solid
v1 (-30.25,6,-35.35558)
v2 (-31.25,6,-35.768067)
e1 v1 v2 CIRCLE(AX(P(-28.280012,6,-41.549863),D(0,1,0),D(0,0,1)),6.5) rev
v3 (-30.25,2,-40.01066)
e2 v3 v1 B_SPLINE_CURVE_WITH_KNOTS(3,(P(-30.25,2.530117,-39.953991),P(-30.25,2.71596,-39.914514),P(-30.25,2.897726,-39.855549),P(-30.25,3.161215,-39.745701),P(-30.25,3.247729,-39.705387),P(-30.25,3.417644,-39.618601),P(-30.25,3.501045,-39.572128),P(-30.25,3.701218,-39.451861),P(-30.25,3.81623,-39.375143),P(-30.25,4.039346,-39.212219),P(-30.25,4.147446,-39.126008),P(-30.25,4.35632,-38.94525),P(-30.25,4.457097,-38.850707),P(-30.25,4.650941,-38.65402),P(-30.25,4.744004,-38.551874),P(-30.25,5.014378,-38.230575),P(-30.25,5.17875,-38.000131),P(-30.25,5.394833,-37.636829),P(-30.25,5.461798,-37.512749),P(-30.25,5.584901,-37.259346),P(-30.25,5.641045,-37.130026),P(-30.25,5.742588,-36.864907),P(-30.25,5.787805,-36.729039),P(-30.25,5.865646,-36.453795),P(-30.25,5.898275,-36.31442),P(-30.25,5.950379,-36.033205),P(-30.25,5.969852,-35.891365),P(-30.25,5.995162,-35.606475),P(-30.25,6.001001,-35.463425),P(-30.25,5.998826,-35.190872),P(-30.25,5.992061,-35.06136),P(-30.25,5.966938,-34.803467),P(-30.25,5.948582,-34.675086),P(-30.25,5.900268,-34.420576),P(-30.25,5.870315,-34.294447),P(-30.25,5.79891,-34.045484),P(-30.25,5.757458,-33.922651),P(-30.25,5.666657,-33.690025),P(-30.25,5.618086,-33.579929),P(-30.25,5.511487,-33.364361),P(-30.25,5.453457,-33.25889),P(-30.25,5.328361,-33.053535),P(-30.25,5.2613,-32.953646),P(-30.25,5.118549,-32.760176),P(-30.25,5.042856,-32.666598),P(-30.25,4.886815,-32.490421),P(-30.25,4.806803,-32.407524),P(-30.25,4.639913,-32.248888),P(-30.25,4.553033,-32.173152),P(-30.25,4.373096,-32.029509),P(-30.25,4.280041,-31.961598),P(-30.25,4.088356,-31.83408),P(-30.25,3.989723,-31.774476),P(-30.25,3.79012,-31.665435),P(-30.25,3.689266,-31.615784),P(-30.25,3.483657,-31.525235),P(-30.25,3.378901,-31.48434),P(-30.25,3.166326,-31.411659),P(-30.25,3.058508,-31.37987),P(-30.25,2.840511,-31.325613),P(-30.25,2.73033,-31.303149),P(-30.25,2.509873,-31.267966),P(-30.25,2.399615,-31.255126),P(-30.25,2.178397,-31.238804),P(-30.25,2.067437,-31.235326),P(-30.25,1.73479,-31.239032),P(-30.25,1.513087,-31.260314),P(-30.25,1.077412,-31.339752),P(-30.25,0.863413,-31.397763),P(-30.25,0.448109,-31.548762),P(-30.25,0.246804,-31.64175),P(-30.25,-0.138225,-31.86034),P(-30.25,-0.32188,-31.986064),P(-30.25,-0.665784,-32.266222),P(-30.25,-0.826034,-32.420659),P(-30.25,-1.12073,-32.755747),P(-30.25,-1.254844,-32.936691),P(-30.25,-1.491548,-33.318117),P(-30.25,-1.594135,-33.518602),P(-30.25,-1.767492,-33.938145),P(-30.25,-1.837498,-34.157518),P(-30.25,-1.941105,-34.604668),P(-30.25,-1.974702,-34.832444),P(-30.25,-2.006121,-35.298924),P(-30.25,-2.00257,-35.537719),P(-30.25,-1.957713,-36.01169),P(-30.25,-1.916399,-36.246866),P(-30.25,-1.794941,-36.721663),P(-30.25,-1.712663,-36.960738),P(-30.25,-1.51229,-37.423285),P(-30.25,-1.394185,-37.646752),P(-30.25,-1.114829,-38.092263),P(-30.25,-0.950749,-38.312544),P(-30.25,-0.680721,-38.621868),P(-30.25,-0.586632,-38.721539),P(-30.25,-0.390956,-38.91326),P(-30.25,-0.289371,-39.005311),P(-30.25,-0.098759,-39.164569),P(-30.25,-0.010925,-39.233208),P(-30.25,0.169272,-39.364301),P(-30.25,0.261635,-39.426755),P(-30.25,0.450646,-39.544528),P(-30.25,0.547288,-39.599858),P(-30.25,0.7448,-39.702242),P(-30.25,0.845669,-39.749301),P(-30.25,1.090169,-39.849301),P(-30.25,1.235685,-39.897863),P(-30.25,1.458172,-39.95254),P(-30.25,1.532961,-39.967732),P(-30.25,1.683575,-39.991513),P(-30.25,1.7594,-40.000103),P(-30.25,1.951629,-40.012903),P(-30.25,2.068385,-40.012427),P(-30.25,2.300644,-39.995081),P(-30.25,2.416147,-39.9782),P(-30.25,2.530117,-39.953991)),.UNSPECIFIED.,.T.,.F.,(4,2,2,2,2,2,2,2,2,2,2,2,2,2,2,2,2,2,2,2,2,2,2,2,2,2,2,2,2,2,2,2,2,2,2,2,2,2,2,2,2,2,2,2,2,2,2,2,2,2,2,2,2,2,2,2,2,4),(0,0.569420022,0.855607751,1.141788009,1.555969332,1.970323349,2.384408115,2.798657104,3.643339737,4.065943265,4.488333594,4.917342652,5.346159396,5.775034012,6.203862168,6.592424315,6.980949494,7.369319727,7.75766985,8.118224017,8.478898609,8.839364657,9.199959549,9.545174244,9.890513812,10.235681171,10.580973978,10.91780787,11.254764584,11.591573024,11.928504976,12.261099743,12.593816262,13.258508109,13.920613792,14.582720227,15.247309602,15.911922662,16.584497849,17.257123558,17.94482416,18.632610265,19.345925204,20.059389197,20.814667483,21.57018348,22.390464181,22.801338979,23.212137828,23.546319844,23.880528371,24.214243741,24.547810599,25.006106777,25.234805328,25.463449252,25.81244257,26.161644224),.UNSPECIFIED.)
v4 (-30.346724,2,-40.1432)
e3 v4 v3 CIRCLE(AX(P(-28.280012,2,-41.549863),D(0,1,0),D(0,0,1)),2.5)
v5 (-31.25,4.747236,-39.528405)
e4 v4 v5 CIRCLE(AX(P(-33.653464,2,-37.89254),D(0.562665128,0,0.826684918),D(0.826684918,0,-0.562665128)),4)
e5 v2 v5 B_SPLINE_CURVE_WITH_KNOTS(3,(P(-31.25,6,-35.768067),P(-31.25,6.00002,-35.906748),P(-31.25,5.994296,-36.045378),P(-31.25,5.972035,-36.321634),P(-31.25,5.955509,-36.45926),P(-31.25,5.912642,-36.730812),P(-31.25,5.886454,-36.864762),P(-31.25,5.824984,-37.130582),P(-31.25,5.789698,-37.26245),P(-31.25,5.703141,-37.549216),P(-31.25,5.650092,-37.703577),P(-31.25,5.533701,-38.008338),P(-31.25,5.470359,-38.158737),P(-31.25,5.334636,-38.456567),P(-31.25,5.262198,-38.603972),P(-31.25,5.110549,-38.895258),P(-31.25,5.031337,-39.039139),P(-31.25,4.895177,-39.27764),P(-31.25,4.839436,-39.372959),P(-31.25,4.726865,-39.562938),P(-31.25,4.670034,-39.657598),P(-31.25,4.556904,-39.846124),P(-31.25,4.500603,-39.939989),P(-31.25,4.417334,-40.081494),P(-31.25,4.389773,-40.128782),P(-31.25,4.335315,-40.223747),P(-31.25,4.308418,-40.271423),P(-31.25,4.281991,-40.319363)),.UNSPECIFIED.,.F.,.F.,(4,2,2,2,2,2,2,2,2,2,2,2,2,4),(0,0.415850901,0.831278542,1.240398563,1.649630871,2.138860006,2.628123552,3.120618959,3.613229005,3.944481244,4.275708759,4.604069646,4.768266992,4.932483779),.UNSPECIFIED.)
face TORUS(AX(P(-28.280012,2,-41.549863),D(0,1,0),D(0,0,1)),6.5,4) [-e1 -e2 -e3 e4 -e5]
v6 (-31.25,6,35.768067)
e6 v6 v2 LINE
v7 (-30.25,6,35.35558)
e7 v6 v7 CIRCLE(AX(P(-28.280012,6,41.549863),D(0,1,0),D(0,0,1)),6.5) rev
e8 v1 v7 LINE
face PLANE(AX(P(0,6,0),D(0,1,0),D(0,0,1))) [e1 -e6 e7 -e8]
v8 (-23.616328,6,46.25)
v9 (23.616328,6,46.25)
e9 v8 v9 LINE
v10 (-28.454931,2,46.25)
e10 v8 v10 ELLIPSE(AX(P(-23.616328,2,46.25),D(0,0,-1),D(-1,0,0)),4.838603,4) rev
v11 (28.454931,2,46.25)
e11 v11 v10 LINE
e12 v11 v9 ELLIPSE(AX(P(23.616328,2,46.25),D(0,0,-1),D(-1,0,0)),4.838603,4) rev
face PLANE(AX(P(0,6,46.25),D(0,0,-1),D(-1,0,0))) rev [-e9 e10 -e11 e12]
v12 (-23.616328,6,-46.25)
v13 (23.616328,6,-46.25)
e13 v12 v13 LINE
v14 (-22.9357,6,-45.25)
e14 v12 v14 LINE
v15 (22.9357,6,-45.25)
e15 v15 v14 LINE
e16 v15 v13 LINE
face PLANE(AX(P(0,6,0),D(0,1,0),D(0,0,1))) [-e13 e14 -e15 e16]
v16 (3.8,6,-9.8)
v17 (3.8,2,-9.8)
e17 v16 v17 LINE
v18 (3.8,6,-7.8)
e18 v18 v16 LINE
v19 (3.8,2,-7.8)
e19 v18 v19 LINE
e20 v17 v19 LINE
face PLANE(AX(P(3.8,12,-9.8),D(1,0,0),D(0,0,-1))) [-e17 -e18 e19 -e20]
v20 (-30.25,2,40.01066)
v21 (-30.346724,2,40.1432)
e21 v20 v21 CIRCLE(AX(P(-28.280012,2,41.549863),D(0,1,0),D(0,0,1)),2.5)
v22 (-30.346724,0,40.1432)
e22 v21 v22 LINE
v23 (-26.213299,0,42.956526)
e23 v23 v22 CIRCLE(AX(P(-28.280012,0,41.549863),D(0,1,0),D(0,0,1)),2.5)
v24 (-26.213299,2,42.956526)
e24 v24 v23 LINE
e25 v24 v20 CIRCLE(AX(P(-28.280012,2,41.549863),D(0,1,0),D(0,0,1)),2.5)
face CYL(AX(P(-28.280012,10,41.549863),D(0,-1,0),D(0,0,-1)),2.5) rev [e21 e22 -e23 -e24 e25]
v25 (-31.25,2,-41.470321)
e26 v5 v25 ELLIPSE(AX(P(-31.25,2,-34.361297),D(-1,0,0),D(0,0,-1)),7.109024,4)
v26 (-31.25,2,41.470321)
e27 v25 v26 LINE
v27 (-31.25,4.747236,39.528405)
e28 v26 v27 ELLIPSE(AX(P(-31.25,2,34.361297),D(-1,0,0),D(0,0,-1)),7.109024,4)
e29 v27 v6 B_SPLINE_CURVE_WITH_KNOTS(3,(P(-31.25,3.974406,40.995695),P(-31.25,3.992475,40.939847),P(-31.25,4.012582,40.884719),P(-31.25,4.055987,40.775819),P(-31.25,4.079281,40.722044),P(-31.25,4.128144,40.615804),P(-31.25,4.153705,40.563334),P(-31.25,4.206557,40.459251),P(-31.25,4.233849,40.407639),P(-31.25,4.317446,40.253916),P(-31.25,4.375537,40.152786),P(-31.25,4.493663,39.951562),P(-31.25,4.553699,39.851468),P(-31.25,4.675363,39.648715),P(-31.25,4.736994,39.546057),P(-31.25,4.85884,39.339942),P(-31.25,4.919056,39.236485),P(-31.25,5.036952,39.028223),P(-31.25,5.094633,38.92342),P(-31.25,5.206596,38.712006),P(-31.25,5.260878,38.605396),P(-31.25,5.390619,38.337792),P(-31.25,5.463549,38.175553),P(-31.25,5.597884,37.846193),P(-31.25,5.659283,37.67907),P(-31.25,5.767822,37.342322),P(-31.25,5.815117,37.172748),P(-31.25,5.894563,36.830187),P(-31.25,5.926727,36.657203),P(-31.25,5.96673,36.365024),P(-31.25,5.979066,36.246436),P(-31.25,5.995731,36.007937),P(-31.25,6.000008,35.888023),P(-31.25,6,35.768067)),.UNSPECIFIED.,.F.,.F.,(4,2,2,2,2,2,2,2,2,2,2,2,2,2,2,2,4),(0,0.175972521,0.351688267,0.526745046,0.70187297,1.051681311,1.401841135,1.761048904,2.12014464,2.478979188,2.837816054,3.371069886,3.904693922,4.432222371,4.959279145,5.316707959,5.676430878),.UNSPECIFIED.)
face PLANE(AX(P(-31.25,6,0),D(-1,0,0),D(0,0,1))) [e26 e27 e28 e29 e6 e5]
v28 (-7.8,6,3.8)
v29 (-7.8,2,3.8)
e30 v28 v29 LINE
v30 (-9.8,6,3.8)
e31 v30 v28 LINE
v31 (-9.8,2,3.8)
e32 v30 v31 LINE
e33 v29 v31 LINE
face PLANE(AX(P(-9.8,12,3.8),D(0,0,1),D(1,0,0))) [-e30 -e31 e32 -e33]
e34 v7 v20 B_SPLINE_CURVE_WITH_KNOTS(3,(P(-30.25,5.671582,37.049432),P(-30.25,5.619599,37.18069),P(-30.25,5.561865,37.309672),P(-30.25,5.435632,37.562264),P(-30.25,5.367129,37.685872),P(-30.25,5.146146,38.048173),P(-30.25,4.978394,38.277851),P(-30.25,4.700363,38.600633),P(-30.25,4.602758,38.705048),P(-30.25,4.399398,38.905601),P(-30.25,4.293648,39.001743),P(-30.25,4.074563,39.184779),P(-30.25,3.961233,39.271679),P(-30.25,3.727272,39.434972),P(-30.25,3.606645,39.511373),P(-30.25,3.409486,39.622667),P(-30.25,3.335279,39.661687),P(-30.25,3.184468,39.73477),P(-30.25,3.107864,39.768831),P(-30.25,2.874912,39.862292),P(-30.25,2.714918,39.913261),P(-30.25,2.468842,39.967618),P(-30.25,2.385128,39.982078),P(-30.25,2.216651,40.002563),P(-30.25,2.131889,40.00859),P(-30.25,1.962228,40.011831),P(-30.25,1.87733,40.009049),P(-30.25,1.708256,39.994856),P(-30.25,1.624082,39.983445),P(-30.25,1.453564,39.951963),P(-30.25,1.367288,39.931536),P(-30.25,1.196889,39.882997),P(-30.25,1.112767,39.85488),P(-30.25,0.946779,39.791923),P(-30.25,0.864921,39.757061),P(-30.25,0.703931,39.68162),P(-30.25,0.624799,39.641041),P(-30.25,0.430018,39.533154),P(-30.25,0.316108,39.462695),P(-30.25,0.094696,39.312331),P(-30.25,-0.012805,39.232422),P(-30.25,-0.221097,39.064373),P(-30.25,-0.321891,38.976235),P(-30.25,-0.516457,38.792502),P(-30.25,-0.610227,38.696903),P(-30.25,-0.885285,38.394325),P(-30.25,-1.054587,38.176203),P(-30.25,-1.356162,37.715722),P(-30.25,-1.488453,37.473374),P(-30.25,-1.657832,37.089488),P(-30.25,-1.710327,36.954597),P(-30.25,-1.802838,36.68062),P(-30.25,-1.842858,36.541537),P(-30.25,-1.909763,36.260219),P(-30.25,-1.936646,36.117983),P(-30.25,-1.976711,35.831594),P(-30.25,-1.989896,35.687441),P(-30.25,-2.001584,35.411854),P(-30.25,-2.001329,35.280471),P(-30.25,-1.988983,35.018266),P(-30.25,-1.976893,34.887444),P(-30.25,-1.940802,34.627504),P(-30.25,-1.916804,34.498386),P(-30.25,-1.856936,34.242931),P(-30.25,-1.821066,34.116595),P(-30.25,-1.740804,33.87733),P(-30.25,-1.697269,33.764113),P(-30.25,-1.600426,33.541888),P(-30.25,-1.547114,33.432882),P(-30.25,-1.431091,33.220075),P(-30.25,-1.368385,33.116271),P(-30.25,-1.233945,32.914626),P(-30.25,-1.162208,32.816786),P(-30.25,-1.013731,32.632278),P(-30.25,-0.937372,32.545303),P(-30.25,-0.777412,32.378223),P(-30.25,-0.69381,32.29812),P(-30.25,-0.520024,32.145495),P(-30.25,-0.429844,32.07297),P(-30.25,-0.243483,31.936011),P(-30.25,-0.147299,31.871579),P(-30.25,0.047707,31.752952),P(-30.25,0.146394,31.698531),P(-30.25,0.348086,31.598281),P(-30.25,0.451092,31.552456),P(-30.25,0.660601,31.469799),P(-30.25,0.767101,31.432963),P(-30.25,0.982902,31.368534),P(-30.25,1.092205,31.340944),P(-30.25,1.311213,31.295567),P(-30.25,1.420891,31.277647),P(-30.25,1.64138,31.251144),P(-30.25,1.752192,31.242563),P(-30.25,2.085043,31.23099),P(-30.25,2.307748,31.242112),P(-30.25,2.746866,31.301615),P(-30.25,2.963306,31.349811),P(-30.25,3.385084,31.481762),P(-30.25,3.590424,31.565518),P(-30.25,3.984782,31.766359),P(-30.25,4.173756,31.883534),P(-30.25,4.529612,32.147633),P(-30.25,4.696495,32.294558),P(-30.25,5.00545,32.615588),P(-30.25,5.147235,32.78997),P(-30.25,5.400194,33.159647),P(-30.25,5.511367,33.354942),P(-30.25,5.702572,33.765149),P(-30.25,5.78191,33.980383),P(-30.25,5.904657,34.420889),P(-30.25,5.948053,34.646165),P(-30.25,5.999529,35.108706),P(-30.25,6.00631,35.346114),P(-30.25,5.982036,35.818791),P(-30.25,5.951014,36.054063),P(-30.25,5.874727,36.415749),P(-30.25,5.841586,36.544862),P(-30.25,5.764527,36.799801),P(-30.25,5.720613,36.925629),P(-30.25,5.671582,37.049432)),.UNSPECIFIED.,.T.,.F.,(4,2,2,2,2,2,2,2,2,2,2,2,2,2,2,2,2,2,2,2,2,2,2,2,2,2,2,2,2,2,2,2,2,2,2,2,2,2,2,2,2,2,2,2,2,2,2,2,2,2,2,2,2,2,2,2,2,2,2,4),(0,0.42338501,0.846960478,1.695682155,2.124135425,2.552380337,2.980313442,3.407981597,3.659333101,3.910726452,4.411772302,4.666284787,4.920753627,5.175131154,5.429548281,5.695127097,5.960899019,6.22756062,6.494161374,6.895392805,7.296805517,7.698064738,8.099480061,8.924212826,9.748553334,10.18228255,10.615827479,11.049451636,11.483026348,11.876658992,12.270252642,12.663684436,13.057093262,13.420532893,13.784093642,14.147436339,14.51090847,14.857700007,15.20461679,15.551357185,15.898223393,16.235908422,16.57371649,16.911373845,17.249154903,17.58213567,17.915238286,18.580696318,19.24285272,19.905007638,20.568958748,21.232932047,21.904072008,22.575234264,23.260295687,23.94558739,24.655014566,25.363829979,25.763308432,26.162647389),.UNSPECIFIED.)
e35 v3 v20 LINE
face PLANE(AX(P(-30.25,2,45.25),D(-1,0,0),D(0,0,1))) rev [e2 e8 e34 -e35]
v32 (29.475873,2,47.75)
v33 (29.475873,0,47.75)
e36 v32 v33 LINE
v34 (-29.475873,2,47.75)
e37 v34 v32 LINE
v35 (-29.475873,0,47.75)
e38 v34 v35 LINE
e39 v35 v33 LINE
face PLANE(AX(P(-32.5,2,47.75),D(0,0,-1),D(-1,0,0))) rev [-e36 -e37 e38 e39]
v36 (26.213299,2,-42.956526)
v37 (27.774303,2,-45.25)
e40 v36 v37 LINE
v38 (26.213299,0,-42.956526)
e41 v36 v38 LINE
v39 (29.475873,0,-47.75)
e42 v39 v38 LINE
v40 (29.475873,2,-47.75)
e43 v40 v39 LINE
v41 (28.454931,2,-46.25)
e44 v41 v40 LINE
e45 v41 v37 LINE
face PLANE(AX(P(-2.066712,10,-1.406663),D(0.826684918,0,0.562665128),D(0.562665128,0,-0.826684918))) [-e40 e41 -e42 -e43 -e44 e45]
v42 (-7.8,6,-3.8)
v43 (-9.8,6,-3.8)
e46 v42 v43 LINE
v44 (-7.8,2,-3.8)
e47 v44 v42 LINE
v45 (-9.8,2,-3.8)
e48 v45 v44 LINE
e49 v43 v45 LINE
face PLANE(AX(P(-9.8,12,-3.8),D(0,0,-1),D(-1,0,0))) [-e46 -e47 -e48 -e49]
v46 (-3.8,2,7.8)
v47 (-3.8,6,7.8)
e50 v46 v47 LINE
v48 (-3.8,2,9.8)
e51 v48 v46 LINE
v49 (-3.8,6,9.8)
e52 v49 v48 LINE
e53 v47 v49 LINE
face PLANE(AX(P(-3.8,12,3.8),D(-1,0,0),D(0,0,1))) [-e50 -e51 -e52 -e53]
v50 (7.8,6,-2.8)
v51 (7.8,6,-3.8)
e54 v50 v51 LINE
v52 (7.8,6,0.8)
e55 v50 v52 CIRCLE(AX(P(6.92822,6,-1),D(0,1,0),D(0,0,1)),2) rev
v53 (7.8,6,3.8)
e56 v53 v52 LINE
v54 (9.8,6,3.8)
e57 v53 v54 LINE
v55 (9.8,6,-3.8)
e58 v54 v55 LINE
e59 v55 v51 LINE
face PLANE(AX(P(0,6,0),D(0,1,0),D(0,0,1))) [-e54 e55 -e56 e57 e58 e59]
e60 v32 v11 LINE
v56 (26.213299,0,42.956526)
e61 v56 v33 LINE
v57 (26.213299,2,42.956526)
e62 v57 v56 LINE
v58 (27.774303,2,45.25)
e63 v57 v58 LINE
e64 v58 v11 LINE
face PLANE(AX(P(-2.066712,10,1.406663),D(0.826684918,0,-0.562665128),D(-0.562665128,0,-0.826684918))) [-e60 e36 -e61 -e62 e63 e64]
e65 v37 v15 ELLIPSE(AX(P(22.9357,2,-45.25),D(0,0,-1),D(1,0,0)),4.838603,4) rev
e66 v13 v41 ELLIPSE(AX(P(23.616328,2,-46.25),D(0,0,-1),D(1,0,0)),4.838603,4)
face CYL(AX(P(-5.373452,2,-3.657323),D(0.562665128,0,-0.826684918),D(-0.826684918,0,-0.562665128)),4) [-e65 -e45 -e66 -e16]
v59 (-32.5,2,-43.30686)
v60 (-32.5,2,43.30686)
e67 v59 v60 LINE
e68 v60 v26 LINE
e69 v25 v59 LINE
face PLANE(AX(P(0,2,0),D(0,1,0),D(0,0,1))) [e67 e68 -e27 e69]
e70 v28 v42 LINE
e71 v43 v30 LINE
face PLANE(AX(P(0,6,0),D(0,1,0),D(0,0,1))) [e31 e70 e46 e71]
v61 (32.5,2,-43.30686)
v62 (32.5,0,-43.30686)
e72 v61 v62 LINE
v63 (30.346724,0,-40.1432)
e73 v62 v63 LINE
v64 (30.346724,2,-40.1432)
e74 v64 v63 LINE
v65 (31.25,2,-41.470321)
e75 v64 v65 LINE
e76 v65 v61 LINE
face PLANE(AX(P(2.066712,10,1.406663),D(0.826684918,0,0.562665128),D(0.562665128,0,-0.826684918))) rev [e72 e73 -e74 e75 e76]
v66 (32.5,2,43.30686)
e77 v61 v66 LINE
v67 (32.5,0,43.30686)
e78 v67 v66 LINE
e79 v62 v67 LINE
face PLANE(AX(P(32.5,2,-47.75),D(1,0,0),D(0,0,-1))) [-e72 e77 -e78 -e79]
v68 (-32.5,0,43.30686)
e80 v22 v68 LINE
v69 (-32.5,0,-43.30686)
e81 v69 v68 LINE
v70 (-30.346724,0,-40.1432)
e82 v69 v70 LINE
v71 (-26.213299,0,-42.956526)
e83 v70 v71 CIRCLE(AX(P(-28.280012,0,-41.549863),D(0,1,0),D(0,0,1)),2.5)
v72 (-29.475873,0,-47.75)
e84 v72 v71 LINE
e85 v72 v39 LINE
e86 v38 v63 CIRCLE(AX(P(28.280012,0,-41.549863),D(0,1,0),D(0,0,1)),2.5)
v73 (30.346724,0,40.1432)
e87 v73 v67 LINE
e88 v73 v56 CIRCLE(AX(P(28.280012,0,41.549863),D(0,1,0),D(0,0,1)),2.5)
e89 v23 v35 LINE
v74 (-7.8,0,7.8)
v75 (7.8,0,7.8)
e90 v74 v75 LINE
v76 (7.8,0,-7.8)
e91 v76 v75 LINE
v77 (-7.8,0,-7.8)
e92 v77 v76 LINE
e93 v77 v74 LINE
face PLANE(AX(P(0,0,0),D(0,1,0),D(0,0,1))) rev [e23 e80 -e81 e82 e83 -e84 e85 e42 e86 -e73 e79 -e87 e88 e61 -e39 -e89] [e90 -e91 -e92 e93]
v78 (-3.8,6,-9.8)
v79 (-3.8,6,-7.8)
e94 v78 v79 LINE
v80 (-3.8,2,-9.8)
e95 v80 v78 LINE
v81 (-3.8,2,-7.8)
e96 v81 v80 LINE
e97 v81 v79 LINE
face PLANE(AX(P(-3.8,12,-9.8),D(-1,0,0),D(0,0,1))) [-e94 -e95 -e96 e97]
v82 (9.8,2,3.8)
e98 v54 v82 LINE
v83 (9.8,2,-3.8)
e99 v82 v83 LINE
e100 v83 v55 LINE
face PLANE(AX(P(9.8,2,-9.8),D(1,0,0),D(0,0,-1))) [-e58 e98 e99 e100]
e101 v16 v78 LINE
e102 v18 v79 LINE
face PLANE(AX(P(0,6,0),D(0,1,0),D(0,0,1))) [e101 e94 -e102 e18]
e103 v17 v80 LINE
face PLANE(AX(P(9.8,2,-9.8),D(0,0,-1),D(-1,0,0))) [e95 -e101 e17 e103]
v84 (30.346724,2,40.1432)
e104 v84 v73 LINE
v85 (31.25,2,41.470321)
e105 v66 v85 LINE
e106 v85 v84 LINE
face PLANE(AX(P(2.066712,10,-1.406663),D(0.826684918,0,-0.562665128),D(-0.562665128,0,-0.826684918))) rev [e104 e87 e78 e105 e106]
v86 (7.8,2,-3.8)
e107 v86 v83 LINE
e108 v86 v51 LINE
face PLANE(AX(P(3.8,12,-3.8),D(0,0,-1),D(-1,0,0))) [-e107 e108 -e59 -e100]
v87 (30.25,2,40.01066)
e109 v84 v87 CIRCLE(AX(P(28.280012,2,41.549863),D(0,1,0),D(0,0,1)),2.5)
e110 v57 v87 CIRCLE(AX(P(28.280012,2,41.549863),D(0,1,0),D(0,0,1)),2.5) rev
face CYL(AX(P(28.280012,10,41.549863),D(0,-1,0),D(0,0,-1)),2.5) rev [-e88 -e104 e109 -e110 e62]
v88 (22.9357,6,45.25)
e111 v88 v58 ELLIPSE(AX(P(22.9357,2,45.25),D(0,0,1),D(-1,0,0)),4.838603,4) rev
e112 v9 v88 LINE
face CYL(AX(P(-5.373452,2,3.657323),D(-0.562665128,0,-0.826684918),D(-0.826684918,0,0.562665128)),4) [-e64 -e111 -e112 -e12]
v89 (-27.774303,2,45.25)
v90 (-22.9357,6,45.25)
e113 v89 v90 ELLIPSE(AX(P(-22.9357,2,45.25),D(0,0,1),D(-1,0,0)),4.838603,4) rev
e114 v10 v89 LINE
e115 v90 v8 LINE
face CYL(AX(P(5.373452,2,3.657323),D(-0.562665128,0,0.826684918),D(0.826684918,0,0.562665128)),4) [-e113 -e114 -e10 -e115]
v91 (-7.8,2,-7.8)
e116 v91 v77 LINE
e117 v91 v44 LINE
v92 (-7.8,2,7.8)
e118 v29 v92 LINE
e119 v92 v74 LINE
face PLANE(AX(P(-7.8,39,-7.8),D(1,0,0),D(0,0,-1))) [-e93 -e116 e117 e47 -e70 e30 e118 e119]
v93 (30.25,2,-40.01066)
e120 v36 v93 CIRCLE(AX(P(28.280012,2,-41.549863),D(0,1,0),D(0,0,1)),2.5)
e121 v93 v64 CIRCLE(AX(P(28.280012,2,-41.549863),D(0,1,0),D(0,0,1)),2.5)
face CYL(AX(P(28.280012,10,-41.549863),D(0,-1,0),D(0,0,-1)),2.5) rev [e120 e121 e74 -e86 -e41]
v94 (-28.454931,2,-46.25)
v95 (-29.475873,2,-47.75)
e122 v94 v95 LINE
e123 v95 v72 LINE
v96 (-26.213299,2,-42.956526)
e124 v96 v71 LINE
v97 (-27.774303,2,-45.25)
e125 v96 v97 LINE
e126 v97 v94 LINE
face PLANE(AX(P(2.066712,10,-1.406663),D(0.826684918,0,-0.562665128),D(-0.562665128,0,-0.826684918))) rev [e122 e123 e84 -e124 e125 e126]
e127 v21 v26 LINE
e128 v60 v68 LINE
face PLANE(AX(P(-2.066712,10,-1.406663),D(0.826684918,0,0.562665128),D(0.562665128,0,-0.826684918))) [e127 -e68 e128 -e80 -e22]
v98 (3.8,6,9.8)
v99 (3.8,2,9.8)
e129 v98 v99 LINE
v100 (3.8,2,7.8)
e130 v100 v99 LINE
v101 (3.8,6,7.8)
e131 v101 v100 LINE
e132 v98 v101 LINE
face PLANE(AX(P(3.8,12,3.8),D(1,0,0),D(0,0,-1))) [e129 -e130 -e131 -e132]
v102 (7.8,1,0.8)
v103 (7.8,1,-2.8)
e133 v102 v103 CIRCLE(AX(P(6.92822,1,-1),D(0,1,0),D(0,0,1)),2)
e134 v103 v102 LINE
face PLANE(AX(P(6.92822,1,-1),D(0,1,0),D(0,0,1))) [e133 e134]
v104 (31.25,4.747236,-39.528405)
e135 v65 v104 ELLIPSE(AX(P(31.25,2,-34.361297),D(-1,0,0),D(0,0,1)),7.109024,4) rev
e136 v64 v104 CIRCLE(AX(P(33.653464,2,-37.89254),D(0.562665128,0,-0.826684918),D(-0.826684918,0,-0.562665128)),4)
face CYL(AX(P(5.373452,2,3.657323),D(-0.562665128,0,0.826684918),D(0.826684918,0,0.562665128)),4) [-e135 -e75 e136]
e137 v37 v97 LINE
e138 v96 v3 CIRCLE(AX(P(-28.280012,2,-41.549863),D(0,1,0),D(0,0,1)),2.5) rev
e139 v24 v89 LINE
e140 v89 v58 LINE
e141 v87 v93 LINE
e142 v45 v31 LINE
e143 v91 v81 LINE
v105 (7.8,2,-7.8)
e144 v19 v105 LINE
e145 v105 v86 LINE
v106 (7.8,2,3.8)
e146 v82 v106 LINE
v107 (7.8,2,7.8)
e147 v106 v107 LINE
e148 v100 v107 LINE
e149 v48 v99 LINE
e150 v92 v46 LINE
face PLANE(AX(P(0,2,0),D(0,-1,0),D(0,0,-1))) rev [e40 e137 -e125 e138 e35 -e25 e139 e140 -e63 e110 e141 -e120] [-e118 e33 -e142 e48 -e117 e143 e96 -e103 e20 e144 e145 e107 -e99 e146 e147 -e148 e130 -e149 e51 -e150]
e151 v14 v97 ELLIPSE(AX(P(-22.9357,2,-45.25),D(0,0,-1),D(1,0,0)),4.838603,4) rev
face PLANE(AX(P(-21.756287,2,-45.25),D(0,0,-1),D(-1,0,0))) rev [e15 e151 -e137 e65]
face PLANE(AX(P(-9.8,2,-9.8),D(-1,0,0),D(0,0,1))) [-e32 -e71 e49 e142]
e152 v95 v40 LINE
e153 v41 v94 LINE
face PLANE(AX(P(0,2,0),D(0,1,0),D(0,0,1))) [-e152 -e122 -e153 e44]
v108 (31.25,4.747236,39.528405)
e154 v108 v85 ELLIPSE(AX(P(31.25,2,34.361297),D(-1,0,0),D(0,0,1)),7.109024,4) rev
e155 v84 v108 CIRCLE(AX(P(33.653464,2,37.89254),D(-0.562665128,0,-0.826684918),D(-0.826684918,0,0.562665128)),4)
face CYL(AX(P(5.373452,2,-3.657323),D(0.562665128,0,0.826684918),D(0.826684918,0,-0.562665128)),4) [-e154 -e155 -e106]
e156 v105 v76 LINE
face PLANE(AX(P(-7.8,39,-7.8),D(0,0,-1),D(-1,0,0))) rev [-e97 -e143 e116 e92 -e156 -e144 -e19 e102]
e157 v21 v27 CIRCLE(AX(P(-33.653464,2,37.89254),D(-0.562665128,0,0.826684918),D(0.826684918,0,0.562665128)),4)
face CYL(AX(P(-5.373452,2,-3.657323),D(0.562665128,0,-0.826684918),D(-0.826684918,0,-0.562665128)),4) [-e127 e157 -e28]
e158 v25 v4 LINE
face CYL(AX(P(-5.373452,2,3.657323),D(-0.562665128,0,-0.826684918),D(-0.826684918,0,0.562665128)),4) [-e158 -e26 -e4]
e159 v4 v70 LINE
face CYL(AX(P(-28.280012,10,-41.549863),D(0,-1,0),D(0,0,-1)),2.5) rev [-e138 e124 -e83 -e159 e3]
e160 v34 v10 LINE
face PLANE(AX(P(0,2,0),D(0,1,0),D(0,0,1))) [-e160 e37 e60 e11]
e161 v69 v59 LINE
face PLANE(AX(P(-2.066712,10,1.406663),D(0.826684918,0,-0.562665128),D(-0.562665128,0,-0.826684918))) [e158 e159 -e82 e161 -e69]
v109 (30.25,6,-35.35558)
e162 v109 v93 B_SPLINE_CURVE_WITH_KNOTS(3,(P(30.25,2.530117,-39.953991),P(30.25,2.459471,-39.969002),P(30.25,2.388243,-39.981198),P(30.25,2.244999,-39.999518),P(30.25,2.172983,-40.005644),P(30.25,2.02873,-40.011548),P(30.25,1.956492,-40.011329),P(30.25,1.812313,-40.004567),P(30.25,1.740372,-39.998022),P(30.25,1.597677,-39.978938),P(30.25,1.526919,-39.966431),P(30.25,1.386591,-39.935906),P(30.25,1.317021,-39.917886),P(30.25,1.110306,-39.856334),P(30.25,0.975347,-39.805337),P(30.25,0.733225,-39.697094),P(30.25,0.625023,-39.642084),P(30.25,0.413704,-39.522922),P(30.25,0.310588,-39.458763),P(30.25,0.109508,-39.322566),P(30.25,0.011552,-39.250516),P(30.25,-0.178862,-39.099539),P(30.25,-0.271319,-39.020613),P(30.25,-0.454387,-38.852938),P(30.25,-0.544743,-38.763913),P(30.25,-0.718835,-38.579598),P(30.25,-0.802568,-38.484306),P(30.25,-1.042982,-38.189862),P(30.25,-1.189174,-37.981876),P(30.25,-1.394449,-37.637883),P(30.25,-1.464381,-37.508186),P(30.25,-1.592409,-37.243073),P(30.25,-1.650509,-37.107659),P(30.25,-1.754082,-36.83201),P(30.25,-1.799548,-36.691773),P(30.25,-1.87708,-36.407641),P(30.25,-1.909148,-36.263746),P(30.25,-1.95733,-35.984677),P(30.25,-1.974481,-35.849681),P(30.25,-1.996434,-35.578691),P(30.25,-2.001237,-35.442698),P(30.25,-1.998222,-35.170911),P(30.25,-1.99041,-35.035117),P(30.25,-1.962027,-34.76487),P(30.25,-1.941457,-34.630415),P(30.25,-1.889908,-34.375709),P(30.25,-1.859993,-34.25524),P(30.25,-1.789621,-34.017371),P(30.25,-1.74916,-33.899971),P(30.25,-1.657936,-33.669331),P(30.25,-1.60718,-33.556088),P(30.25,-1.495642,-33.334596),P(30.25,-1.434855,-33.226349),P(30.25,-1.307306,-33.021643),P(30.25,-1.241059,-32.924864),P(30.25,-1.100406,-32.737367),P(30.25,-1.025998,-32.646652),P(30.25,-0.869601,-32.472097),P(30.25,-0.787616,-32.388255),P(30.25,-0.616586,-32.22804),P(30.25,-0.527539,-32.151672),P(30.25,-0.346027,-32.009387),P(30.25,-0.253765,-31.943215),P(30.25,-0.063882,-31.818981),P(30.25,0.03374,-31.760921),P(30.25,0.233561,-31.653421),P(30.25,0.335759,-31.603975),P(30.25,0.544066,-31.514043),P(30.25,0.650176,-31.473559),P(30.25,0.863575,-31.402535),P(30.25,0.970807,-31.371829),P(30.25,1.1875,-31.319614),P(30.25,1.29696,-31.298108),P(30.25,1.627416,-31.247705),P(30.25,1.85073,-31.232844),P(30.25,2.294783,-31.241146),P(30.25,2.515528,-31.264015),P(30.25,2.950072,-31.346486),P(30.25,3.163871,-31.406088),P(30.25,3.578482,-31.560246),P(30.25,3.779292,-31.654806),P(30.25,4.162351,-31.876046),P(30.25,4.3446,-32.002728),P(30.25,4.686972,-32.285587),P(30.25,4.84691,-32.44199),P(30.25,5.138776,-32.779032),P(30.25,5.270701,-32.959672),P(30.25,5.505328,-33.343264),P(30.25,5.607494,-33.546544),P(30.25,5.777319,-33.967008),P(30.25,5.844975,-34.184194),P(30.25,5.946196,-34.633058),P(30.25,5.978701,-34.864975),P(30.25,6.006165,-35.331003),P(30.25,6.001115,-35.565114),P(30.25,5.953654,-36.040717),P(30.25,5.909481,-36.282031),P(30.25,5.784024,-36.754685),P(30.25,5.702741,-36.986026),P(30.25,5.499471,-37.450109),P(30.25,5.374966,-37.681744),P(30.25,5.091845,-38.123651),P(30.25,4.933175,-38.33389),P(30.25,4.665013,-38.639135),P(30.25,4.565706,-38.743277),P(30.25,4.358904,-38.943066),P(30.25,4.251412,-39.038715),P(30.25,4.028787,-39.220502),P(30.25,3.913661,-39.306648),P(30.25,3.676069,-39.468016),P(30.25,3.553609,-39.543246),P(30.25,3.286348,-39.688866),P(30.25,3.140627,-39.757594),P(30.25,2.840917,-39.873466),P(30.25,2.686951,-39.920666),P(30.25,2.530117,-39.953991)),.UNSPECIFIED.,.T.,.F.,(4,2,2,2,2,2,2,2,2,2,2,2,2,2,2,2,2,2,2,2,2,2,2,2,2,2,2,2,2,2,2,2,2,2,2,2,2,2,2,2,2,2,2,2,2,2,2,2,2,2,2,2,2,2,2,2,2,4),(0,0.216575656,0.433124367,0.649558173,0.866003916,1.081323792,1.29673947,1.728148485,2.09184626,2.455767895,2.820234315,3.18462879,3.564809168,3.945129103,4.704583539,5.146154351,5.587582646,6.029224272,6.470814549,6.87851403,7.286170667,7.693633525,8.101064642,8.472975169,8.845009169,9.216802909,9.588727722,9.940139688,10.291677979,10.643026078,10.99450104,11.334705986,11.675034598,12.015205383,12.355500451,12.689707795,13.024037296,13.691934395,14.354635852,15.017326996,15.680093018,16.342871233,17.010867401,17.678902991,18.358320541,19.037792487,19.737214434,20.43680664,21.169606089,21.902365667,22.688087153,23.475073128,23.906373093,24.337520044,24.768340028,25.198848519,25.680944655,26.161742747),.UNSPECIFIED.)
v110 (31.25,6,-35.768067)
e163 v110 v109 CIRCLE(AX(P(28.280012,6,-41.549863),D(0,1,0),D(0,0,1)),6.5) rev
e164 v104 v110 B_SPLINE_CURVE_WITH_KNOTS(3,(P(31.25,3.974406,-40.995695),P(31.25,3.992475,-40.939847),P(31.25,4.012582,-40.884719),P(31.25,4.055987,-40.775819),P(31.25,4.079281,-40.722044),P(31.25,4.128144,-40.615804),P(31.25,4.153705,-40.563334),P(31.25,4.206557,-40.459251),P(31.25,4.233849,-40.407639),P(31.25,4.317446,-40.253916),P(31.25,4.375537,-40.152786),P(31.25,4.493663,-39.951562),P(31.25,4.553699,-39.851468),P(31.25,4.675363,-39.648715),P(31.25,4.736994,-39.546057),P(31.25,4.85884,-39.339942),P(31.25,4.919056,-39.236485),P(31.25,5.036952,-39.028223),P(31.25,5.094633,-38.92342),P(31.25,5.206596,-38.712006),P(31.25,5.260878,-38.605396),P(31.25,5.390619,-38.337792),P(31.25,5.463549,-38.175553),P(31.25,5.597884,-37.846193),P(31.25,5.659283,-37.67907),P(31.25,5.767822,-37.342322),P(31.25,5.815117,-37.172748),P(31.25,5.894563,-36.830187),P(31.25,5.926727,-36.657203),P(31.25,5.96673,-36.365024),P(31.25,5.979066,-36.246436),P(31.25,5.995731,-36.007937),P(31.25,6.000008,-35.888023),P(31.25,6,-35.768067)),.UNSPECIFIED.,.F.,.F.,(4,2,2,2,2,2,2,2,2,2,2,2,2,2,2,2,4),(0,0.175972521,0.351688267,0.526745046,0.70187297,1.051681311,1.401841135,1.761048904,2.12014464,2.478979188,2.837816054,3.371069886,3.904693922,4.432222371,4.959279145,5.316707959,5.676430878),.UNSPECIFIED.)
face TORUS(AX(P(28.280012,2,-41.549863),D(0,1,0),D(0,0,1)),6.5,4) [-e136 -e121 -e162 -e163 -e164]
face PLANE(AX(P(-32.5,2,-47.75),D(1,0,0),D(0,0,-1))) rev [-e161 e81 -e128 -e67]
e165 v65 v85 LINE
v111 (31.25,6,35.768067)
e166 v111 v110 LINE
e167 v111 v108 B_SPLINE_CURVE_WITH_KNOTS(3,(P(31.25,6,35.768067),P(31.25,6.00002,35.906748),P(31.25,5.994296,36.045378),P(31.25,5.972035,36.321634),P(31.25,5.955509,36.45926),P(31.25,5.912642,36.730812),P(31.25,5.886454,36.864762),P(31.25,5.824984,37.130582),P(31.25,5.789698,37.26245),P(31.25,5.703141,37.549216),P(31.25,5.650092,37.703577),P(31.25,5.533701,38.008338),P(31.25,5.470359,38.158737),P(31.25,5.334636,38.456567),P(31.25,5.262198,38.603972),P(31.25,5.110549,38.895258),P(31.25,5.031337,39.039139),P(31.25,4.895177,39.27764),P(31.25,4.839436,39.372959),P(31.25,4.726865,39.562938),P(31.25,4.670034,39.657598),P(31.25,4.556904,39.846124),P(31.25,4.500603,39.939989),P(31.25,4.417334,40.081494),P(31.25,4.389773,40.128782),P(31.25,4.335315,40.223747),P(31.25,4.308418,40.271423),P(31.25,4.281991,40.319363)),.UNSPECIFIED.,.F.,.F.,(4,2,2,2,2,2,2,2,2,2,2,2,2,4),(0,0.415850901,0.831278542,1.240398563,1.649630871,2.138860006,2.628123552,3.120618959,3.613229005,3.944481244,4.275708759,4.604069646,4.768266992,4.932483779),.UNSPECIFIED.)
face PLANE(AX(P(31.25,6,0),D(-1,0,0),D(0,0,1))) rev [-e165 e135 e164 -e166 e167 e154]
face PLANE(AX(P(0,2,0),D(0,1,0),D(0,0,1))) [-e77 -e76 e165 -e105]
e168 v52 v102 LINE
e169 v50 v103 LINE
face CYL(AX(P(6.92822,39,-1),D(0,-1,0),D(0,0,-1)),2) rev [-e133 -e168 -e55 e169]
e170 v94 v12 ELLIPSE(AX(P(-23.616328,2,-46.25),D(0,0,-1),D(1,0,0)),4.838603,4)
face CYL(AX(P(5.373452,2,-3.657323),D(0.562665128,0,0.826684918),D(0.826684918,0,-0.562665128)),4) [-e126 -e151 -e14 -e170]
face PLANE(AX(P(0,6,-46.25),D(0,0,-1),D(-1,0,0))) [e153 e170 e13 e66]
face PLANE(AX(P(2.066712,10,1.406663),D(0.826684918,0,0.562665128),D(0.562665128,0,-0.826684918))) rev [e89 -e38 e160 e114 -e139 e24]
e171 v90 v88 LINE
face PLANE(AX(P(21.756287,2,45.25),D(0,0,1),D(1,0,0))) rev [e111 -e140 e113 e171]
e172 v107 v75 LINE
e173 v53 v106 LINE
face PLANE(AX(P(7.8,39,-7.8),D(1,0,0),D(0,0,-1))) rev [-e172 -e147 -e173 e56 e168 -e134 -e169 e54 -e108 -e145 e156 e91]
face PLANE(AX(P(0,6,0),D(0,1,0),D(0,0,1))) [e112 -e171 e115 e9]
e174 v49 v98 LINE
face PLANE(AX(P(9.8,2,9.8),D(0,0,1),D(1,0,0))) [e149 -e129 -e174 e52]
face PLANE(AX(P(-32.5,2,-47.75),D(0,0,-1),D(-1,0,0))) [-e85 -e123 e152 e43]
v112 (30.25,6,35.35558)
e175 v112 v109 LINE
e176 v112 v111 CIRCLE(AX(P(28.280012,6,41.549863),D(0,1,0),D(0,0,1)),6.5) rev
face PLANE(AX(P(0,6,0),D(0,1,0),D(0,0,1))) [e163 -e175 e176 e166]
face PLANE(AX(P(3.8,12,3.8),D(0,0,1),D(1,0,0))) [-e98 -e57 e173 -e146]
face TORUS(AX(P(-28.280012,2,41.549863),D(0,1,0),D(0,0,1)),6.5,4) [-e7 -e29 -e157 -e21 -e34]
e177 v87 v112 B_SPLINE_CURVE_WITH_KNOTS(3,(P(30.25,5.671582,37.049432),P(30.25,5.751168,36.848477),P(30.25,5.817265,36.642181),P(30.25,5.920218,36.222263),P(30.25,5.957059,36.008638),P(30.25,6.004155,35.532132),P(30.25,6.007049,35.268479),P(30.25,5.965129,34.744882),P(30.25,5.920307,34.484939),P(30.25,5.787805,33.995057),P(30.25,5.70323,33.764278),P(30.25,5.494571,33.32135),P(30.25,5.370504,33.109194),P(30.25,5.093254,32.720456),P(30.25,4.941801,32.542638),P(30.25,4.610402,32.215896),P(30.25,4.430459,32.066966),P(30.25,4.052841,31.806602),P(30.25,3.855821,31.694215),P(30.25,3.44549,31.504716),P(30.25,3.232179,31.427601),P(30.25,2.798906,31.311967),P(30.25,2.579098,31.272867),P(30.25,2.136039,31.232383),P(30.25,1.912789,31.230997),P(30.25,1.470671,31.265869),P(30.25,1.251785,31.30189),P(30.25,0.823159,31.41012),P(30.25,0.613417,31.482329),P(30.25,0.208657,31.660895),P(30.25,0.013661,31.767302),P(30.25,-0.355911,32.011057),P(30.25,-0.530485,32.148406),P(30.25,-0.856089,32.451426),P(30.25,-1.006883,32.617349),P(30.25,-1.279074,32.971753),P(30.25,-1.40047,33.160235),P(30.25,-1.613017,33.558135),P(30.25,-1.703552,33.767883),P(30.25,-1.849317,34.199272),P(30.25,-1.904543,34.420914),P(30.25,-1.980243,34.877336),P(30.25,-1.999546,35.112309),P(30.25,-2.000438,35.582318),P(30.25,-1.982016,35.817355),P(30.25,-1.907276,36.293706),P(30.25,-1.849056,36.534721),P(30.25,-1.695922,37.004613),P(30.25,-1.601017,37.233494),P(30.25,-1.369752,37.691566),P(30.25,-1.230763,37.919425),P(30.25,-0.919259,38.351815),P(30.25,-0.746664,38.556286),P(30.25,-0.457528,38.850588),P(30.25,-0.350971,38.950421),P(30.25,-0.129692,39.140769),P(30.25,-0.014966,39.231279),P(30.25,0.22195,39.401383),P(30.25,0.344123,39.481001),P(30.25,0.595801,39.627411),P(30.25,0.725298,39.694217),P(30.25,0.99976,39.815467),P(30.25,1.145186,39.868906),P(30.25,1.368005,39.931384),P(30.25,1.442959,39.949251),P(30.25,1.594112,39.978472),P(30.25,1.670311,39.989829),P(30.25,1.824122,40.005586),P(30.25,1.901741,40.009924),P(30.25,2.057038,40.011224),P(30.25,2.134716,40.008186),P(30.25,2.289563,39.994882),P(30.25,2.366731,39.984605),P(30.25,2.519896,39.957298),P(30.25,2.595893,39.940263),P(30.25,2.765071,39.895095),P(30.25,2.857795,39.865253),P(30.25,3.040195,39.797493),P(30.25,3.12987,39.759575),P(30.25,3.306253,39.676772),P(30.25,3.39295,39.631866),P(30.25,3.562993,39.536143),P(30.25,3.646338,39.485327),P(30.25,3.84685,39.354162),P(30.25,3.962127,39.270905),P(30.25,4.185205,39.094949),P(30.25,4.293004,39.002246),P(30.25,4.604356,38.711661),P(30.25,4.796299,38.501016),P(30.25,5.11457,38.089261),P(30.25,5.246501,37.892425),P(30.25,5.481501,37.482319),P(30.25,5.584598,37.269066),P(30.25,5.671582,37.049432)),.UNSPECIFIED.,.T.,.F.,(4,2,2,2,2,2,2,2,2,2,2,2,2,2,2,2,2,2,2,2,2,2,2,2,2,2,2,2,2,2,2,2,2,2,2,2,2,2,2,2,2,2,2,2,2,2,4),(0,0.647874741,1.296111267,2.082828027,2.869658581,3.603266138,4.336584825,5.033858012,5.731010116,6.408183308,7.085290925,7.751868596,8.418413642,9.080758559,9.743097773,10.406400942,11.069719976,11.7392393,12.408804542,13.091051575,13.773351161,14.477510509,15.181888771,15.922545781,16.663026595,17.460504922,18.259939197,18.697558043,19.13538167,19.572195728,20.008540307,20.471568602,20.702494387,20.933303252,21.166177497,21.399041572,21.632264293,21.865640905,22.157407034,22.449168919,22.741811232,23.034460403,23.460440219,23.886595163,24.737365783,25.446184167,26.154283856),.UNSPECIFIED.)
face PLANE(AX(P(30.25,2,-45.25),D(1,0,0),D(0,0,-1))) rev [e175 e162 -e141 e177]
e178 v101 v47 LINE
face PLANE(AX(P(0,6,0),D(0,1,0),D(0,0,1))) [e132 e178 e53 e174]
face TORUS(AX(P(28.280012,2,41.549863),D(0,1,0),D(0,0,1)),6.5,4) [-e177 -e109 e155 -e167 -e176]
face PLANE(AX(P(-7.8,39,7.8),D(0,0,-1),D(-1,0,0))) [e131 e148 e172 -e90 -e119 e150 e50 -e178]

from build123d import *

# Parameters (mm, degrees)
SKETCH1_W           = 65
SKETCH1_H           = 95.5
BOSS_EXTRUDE1_DEPTH = 2
SKETCH1_3_W         = 62.5
SKETCH1_3_H         = 92.5
BOSS_EXTRUDE2_DEPTH = 6
SKETCH2_4_W         = 19.6
SKETCH2_4_H         = 19.6
BOSS_EXTRUDE3_DEPTH = 6
CUT_EXTRUDE2_DEPTH  = 39
CUT_EXTRUDE3_DEPTH  = 10
FILLET1_R           = 4
BOSS_EXTRUDE4_DEPTH = 1
SKETCH5_W           = 19.6
SKETCH5_H           = 19.6
CUT_EXTRUDE7_DEPTH  = 4
SKETCH8_W           = 6
SKETCH8_H           = 6
CUT_EXTRUDE8_DEPTH  = 10


with BuildPart() as part:
    # Sketch1 → Boss-Extrude1 (new body)
    with BuildSketch(Plane(origin=(0, 0, 0), x_dir=(1, 0, 0), z_dir=(0, 1, 0))):
        Rectangle(SKETCH1_W, SKETCH1_H)
    extrude(amount=BOSS_EXTRUDE1_DEPTH)

    # Sketch1<3> → Boss-Extrude2 (add)
    with BuildSketch(Plane(origin=(0, 0, 0), x_dir=(1, 0, 0), z_dir=(0, 1, 0))):
        Rectangle(SKETCH1_3_W, SKETCH1_3_H)
    extrude(amount=BOSS_EXTRUDE2_DEPTH)

    # Sketch2<4> → Boss-Extrude3 (add)
    with BuildSketch(Plane(origin=(0, 0, 0), x_dir=(1, 0, 0), z_dir=(0, 1, 0))):
        Rectangle(SKETCH2_4_W, SKETCH2_4_H)
    extrude(amount=BOSS_EXTRUDE3_DEPTH)

    # Sketch2 → Cut-Extrude2 (cut)
    with BuildSketch(Plane(origin=(0, 0, 0), x_dir=(1, 0, 0), z_dir=(0, 1, 0))):
        with BuildLine():
            Line((-7.8, 7.8), (-7.8, -7.8))
            Line((-7.8, -7.8), (7.8, -7.8))
            Line((7.8, -7.8), (7.8, -0.8))
            ThreePointArc((7.8, -0.8), (8.928220211, 1), (7.8, 2.8))
            Line((7.8, 2.8), (7.8, 7.8))
            Line((7.8, 7.8), (-7.8, 7.8))
        make_face()
    extrude(amount=CUT_EXTRUDE2_DEPTH, mode=Mode.SUBTRACT)

    # Sketch3 → Cut-Extrude3 (cut)
    with BuildSketch(Plane(origin=(0, 0, 0), x_dir=(1, 0, 0), z_dir=(0, 1, 0))):
        with BuildLine():
            Line((-30.433287704, 49.156662819), (-34.566712296, 46.343337181))
            Line((-34.566712296, 46.343337181), (-30.346723838, 40.143200294))
            ThreePointArc((-30.346723838, 40.143200294), (-26.873348724, 39.483150817), (-26.213299247, 42.956525932))
            Line((-26.213299247, 42.956525932), (-30.433287704, 49.156662819))
        make_face()
        with BuildLine():
            Line((34.566712296, 46.343337181), (30.433287704, 49.156662819))
            Line((30.433287704, 49.156662819), (26.213299247, 42.956525932))
            ThreePointArc((26.213299247, 42.956525932), (26.873348724, 39.483150817), (30.346723838, 40.143200294))
            Line((30.346723838, 40.143200294), (34.566712296, 46.343337181))
        make_face()
        with BuildLine():
            Line((-30.346723838, -40.143200294), (-34.566712296, -46.343337181))
            Line((-34.566712296, -46.343337181), (-30.433287704, -49.156662819))
            Line((-30.433287704, -49.156662819), (-26.213299247, -42.956525932))
            ThreePointArc((-26.213299247, -42.956525932), (-26.873348724, -39.483150817), (-30.346723838, -40.143200294))
        make_face()
        with BuildLine():
            Line((26.213299247, -42.956525932), (30.433287704, -49.156662819))
            Line((30.433287704, -49.156662819), (34.566712296, -46.343337181))
            Line((34.566712296, -46.343337181), (30.346723838, -40.143200294))
            ThreePointArc((30.346723838, -40.143200294), (26.873348724, -39.483150817), (26.213299247, -42.956525932))
        make_face()
    extrude(amount=CUT_EXTRUDE3_DEPTH, mode=Mode.SUBTRACT)

    # Fillet1
    # the kernel refuses this fillet: 4 mm, written as the material it takes off along each edge
    with BuildSketch(Plane(origin=(-36.876651276, 6, 49.737170606), x_dir=(0, -1, 0), z_dir=(0.5626651276372232, 0, -0.826684918297768)), Plane(origin=(30.346723838, 6, 40.143200294), x_dir=(0, -1, 0), z_dir=(0.5626651276372238, 0, 0.8266849182977677)), Plane(origin=(36.876651276, 6, -49.737170606), x_dir=(0, -1, 0), z_dir=(-0.562665127637224, 0, 0.8266849182977676)), Plane(origin=(-30.346723838, 6, -40.143200294), x_dir=(0, -1, 0), z_dir=(-0.5626651276372242, 0, -0.8266849182977674))) as fillet1_piece_1:
        with BuildLine():
            CenterArc((FILLET1_R, FILLET1_R), FILLET1_R, 180, 90)
            Line((0, FILLET1_R), (0, 0))
            Line((0, 0), (FILLET1_R, 0))
        make_face()
    extrude(amount=11.605353019, mode=Mode.SUBTRACT)
    with BuildSketch(Plane(origin=(-26.213299247, 6, 42.956525932), x_dir=(0, -1, 0), z_dir=(-0.5626651276372243, 0, 0.8266849182977672)), Plane(origin=(34.081582088, 6, 54.516849183), x_dir=(0, -1, 0), z_dir=(-0.5626651276372246, 0, -0.826684918297767)), Plane(origin=(26.213299247, 6, -42.956525932), x_dir=(0, -1, 0), z_dir=(0.5626651276372232, 0, -0.826684918297768)), Plane(origin=(-34.081582088, 6, -54.516849183), x_dir=(0, -1, 0), z_dir=(0.562665127637224, 0, 0.8266849182977676))) as fillet1_piece_2:
        with BuildLine():
            CenterArc((FILLET1_R, FILLET1_R), FILLET1_R, 180, 90)
            Line((0, FILLET1_R), (0, 0))
            Line((0, 0), (FILLET1_R, 0))
        make_face()
    extrude(amount=13.983953251, mode=Mode.SUBTRACT)
    with BuildSketch(Plane(origin=(-28.280011543, 6, 41.549863113), x_dir=(-0.8266849182977704, 0, -0.5626651276372198), z_dir=(-0.5626651276372198, 0, 0.8266849182977704))) as fillet1_piece_3:
        with BuildLine():
            CenterArc((2.5 + FILLET1_R, FILLET1_R), FILLET1_R, 180, 90)
            Line((2.5 + FILLET1_R, 0), (2.5, 0))
            Line((2.5, 0), (2.5, FILLET1_R))
        make_face()
    revolve(axis=Axis((-28.280011543, 6, 41.549863113), (0, -1, 0)), revolution_arc=180, mode=Mode.SUBTRACT)
    with BuildSketch(Plane(origin=(28.280011543, 6, 41.549863113), x_dir=(-0.8266849182977659, 0, 0.5626651276372262), z_dir=(0.5626651276372262, 0, 0.8266849182977659))) as fillet1_piece_4:
        with BuildLine():
            CenterArc((2.5 + FILLET1_R, FILLET1_R), FILLET1_R, 180, 90)
            Line((2.5 + FILLET1_R, 0), (2.5, 0))
            Line((2.5, 0), (2.5, FILLET1_R))
        make_face()
    revolve(axis=Axis((28.280011543, 6, 41.549863113), (0, -1, 0)), revolution_arc=180, mode=Mode.SUBTRACT)
    with BuildSketch(Plane(origin=(28.280011543, 6, -41.549863113), x_dir=(0.826684918297769, 0, 0.5626651276372218), z_dir=(0.5626651276372218, 0, -0.826684918297769))) as fillet1_piece_5:
        with BuildLine():
            CenterArc((2.5 + FILLET1_R, FILLET1_R), FILLET1_R, 180, 90)
            Line((2.5 + FILLET1_R, 0), (2.5, 0))
            Line((2.5, 0), (2.5, FILLET1_R))
        make_face()
    revolve(axis=Axis((28.280011543, 6, -41.549863113), (0, -1, 0)), revolution_arc=180, mode=Mode.SUBTRACT)
    with BuildSketch(Plane(origin=(-28.280011543, 6, -41.549863113), x_dir=(0.8266849182977655, 0, -0.562665127637227), z_dir=(-0.562665127637227, 0, -0.8266849182977655))) as fillet1_piece_6:
        with BuildLine():
            CenterArc((2.5 + FILLET1_R, FILLET1_R), FILLET1_R, 180, 90)
            Line((2.5 + FILLET1_R, 0), (2.5, 0))
            Line((2.5, 0), (2.5, FILLET1_R))
        make_face()
    revolve(axis=Axis((-28.280011543, 6, -41.549863113), (0, -1, 0)), revolution_arc=180, mode=Mode.SUBTRACT)

    # Sketch7 → Boss-Extrude4 (add)
    with BuildSketch(Plane(origin=(0, 0, 0), x_dir=(1, 0, 0), z_dir=(0, 1, 0))):
        with BuildLine():
            Line((7.8, 2.8), (7.8, -0.8))
            ThreePointArc((7.8, -0.8), (8.928220211, 1), (7.8, 2.8))
        make_face()
    extrude(amount=BOSS_EXTRUDE4_DEPTH)

    # Sketch5 → Cut-Extrude7 (cut)
    with BuildSketch(Plane(origin=(0, 6, 0), x_dir=(1, 0, 0), z_dir=(0, 1, 0))):
        Polygon((-21.756286609, -45.25), (21.756286609, -45.25), (30.25, -45.25), (30.25, -34.313210193), (30.25, 34.313210193), (30.25, 45.25), (21.756286609, 45.25), (-21.756286609, 45.25), (-30.25, 45.25), (-30.25, 34.313210193), (-30.25, -34.313210193), (-30.25, -45.25), align=None)
        Rectangle(SKETCH5_W, SKETCH5_H, mode=Mode.SUBTRACT)
    extrude(amount=-CUT_EXTRUDE7_DEPTH, mode=Mode.SUBTRACT)

    # Sketch8 → Cut-Extrude8 (cut)
    with BuildSketch(Plane(origin=(0, 2, 0), x_dir=(1, 0, 0), z_dir=(0, 1, 0))):
        with Locations((6.8, 6.8)):
            Rectangle(SKETCH8_W, SKETCH8_H)
        with Locations((-6.8, 6.8)):
            Rectangle(SKETCH8_W, SKETCH8_H)
        with Locations((-6.8, -6.8)):
            Rectangle(SKETCH8_W, SKETCH8_H)
        with Locations((6.8, -6.8)):
            Rectangle(SKETCH8_W, SKETCH8_H)
    extrude(amount=CUT_EXTRUDE8_DEPTH, mode=Mode.SUBTRACT)


solid = part.part
